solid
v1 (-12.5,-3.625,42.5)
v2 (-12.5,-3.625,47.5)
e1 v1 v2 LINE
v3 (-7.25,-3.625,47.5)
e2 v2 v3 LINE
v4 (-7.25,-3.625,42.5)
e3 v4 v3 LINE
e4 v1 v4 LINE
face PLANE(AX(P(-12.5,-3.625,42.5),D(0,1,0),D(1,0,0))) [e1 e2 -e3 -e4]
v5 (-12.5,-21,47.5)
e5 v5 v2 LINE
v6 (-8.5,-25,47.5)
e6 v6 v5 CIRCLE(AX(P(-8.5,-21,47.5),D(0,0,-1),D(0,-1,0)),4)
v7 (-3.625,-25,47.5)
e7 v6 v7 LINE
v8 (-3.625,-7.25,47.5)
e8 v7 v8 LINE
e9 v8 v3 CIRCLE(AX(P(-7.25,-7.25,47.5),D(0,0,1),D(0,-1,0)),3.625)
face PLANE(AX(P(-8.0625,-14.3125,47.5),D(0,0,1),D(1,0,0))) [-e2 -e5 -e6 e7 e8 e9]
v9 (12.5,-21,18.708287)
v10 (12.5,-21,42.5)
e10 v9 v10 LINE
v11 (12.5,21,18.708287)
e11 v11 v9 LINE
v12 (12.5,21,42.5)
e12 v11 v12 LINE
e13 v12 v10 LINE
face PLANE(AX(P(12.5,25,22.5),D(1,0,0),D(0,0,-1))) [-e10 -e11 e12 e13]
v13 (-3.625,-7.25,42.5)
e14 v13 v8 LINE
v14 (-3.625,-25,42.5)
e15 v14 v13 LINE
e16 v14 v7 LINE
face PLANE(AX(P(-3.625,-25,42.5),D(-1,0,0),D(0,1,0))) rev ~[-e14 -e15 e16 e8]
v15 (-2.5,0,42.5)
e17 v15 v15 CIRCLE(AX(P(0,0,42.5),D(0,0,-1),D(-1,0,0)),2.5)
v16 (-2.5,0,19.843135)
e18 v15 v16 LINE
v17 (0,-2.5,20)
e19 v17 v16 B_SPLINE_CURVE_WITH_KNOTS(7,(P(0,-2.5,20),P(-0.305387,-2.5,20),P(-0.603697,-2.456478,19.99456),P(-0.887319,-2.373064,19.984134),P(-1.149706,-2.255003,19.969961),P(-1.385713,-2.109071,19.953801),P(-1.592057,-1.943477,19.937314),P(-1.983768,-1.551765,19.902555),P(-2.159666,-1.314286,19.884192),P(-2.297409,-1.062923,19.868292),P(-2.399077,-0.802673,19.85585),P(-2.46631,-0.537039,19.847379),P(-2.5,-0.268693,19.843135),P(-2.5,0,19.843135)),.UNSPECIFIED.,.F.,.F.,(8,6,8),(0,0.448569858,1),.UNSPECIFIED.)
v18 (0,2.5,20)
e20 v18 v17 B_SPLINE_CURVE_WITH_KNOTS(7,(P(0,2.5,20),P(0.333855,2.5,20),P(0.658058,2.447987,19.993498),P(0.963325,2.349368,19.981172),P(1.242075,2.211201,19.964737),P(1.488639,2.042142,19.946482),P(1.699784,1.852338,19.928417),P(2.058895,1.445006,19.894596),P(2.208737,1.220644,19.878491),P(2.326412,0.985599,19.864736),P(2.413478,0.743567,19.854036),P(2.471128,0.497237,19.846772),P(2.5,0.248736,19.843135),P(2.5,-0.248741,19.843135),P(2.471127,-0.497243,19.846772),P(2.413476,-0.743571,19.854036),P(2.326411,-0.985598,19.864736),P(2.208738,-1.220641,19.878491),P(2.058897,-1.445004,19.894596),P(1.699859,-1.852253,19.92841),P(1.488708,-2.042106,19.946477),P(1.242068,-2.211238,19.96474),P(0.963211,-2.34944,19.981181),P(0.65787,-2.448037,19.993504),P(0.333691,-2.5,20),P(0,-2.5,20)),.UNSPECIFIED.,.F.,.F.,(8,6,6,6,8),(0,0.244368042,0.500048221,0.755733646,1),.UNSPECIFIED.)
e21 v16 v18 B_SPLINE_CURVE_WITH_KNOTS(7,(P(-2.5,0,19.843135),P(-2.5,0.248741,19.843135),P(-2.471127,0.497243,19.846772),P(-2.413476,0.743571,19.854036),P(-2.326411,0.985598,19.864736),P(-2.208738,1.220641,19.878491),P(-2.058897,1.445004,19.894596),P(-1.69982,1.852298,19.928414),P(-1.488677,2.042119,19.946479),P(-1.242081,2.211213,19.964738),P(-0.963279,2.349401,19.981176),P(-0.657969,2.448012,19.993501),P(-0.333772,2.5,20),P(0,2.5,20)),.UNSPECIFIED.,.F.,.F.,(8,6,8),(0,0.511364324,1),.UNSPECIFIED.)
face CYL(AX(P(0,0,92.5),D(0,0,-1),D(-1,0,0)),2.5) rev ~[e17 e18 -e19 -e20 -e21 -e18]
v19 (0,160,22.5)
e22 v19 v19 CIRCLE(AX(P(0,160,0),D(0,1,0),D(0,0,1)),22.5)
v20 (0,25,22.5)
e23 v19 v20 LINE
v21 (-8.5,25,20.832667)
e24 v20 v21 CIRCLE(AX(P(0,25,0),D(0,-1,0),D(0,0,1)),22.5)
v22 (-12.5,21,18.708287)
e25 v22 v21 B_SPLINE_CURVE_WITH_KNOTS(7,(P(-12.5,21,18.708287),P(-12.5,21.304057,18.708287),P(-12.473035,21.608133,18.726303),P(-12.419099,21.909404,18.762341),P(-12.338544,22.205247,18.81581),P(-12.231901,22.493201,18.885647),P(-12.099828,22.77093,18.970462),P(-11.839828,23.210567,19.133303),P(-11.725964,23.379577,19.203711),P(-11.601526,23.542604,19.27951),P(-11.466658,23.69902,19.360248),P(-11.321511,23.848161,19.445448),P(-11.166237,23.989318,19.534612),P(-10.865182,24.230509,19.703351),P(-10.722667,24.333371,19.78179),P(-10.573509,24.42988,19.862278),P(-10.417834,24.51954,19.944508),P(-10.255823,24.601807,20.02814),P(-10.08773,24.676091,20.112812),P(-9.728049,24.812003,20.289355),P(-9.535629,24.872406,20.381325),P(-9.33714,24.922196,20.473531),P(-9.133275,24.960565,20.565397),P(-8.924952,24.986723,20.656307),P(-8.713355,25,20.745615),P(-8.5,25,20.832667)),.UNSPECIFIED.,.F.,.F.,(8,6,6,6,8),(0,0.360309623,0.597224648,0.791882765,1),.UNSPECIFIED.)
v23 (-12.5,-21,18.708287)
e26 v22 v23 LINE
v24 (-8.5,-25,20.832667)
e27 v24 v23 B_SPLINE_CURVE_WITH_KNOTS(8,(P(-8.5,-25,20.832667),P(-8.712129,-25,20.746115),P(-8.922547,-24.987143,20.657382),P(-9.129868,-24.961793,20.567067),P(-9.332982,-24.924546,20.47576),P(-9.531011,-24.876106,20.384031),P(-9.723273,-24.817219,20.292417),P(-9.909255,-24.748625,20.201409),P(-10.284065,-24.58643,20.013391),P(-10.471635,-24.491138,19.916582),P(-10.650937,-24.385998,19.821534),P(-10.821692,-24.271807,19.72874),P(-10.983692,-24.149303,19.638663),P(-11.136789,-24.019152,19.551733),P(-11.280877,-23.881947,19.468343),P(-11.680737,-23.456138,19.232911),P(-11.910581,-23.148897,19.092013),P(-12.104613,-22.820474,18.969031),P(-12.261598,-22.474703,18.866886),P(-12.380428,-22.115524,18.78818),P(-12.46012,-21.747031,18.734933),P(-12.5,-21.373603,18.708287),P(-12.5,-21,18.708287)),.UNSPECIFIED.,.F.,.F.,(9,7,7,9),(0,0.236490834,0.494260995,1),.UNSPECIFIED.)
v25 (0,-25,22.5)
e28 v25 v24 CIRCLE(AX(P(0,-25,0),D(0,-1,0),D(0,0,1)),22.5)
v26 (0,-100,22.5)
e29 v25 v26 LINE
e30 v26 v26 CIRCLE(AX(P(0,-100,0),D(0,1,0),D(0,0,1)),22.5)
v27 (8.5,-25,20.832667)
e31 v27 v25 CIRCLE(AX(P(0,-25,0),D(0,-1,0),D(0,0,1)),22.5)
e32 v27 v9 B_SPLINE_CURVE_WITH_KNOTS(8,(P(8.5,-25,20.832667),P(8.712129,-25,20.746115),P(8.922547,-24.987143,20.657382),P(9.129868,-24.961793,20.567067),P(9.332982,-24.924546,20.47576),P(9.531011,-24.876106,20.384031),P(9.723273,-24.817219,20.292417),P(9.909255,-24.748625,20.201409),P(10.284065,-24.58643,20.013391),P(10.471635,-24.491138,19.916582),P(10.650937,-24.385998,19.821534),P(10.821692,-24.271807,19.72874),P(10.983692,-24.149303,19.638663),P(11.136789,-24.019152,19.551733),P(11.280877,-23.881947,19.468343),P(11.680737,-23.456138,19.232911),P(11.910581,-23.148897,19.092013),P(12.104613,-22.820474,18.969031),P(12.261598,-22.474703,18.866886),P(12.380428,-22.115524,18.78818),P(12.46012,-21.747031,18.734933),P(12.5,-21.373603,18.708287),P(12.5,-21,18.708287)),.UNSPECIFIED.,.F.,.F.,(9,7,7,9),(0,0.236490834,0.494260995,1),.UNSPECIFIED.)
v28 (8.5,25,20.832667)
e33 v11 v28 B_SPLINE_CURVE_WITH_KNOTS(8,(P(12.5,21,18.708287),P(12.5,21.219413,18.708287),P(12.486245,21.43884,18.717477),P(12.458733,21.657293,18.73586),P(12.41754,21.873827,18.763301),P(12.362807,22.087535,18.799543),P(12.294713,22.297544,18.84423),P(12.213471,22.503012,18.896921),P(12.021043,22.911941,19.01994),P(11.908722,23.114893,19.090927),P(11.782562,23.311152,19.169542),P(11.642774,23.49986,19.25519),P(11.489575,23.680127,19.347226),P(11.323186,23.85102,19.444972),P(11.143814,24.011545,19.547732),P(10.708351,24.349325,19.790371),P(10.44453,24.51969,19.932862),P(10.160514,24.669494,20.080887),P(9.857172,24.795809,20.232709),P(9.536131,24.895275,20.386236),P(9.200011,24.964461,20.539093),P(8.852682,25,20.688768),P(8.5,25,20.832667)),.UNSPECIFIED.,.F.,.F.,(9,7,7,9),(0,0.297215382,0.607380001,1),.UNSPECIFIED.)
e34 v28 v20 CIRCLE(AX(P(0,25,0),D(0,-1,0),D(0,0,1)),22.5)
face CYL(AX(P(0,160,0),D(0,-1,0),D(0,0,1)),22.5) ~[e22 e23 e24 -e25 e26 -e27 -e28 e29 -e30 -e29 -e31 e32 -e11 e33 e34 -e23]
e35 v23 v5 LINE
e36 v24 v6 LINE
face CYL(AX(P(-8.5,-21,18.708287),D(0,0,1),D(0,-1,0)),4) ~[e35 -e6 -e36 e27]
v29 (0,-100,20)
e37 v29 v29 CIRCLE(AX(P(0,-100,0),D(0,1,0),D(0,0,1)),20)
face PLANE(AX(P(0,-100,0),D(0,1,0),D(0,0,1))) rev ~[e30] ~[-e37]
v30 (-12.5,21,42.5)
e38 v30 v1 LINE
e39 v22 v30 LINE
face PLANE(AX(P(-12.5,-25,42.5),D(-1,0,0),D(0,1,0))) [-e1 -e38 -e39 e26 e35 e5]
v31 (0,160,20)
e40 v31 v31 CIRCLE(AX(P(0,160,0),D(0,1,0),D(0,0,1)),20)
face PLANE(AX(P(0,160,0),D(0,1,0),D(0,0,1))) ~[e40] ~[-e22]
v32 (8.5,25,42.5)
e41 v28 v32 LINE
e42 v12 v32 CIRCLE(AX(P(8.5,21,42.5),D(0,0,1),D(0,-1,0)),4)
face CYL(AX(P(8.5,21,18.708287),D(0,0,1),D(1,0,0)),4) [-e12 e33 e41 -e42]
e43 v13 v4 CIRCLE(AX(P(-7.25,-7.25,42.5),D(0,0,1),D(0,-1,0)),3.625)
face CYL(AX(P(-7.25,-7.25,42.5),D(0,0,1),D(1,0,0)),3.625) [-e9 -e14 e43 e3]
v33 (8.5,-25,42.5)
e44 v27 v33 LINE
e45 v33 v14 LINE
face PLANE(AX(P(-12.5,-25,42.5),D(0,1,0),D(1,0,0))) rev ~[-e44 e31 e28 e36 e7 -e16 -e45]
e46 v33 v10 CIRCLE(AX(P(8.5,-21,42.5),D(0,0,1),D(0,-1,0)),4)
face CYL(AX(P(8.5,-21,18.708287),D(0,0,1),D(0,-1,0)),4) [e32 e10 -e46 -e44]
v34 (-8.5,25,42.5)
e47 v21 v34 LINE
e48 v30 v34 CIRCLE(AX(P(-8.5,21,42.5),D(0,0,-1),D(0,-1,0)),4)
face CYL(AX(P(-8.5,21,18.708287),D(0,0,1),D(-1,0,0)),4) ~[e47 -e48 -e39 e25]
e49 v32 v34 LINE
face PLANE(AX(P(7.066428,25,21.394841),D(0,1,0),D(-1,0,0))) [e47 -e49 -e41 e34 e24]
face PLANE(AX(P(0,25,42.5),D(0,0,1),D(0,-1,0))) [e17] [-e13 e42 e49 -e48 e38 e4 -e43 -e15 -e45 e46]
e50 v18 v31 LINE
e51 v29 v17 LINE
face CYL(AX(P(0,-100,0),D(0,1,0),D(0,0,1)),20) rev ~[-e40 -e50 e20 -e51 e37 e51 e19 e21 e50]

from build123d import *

# Parameters (mm, degrees)
F2_DEPTH = 12.5
F4_DEPTH = 50
F6_D     = 5
F6_DEPTH = 50
F6_TIP   = 1.5021515476
F7_W     = 8.875
F7_H     = 21.375
F8_DEPTH = 5
F9_R     = 3.625
F10_R    = 4


# Not quite as in the source:
# - a feature names something its author has since deleted; it is built from what else it names


with BuildPart() as f1:
    # F0 (on Right) → F1 (revolve)
    with BuildSketch(Plane.YZ):
        Polygon((-25, 22.5), (-100, 22.5), (-100, 20), (0, 20), (100, 20), (160, 20), (160, 22.5), (100, 22.5), (25, 22.5), (0, 22.5), align=None)
    revolve(axis=Axis((0, 2.0652181371, 0), (0, 1, 0)))

    # F0 (on Right) → F2 (join, symmetric)
    with BuildSketch(Plane.YZ):
        Polygon((-25, 42.5), (-25, 22.5), (0, 22.5), (25, 22.5), (25, 42.5), (0, 42.5), align=None)
    extrude(amount=F2_DEPTH, both=True)

    # F3 (on face) → F4 (join)
    with BuildSketch(Plane(origin=(0, 25, 0), x_dir=(-1, 0, 0), z_dir=(0, 1, 0))):
        Polygon((0, 22.5), (-12.5, 22.5), (-12.5, 18.6568256468), align=None)
        Polygon((12.5, 22.5), (0, 22.5), (12.5, 18.6568256468), align=None)
    extrude(amount=-F4_DEPTH)

    # F6
    with Locations(Plane.XY.offset(42.5)):
        with Locations((0, 0)):
            Hole(F6_D / 2, depth=F6_DEPTH)
            with Locations((0, 0, -(F6_DEPTH + F6_TIP / 2))):  # 118° drill point
                Cone(0, F6_D / 2, F6_TIP, mode=Mode.SUBTRACT)

    # F7 (on face) → F8 (join)
    with BuildSketch(Plane.XY.offset(42.5)):
        with Locations((-8.0625, -14.3125)):
            Rectangle(F7_W, F7_H)
    extrude(amount=F8_DEPTH)

    # F9
    f9_edges = [f1.edges().sort_by_distance(p)[0] for p in [
        (-3.625, -3.625, 45),
    ]]
    fillet(f9_edges, radius=F9_R)

    # F10
    f10_edges = [f1.edges().sort_by_distance(p)[0] for p in [
        (12.5, 25, 30.604143),
        (12.5, -25, 30.604143),
        (-12.5, 25, 30.604143),
        (-12.5, -25, 33.104143),
    ]]
    fillet(f10_edges, radius=F10_R)


solid = f1.part
